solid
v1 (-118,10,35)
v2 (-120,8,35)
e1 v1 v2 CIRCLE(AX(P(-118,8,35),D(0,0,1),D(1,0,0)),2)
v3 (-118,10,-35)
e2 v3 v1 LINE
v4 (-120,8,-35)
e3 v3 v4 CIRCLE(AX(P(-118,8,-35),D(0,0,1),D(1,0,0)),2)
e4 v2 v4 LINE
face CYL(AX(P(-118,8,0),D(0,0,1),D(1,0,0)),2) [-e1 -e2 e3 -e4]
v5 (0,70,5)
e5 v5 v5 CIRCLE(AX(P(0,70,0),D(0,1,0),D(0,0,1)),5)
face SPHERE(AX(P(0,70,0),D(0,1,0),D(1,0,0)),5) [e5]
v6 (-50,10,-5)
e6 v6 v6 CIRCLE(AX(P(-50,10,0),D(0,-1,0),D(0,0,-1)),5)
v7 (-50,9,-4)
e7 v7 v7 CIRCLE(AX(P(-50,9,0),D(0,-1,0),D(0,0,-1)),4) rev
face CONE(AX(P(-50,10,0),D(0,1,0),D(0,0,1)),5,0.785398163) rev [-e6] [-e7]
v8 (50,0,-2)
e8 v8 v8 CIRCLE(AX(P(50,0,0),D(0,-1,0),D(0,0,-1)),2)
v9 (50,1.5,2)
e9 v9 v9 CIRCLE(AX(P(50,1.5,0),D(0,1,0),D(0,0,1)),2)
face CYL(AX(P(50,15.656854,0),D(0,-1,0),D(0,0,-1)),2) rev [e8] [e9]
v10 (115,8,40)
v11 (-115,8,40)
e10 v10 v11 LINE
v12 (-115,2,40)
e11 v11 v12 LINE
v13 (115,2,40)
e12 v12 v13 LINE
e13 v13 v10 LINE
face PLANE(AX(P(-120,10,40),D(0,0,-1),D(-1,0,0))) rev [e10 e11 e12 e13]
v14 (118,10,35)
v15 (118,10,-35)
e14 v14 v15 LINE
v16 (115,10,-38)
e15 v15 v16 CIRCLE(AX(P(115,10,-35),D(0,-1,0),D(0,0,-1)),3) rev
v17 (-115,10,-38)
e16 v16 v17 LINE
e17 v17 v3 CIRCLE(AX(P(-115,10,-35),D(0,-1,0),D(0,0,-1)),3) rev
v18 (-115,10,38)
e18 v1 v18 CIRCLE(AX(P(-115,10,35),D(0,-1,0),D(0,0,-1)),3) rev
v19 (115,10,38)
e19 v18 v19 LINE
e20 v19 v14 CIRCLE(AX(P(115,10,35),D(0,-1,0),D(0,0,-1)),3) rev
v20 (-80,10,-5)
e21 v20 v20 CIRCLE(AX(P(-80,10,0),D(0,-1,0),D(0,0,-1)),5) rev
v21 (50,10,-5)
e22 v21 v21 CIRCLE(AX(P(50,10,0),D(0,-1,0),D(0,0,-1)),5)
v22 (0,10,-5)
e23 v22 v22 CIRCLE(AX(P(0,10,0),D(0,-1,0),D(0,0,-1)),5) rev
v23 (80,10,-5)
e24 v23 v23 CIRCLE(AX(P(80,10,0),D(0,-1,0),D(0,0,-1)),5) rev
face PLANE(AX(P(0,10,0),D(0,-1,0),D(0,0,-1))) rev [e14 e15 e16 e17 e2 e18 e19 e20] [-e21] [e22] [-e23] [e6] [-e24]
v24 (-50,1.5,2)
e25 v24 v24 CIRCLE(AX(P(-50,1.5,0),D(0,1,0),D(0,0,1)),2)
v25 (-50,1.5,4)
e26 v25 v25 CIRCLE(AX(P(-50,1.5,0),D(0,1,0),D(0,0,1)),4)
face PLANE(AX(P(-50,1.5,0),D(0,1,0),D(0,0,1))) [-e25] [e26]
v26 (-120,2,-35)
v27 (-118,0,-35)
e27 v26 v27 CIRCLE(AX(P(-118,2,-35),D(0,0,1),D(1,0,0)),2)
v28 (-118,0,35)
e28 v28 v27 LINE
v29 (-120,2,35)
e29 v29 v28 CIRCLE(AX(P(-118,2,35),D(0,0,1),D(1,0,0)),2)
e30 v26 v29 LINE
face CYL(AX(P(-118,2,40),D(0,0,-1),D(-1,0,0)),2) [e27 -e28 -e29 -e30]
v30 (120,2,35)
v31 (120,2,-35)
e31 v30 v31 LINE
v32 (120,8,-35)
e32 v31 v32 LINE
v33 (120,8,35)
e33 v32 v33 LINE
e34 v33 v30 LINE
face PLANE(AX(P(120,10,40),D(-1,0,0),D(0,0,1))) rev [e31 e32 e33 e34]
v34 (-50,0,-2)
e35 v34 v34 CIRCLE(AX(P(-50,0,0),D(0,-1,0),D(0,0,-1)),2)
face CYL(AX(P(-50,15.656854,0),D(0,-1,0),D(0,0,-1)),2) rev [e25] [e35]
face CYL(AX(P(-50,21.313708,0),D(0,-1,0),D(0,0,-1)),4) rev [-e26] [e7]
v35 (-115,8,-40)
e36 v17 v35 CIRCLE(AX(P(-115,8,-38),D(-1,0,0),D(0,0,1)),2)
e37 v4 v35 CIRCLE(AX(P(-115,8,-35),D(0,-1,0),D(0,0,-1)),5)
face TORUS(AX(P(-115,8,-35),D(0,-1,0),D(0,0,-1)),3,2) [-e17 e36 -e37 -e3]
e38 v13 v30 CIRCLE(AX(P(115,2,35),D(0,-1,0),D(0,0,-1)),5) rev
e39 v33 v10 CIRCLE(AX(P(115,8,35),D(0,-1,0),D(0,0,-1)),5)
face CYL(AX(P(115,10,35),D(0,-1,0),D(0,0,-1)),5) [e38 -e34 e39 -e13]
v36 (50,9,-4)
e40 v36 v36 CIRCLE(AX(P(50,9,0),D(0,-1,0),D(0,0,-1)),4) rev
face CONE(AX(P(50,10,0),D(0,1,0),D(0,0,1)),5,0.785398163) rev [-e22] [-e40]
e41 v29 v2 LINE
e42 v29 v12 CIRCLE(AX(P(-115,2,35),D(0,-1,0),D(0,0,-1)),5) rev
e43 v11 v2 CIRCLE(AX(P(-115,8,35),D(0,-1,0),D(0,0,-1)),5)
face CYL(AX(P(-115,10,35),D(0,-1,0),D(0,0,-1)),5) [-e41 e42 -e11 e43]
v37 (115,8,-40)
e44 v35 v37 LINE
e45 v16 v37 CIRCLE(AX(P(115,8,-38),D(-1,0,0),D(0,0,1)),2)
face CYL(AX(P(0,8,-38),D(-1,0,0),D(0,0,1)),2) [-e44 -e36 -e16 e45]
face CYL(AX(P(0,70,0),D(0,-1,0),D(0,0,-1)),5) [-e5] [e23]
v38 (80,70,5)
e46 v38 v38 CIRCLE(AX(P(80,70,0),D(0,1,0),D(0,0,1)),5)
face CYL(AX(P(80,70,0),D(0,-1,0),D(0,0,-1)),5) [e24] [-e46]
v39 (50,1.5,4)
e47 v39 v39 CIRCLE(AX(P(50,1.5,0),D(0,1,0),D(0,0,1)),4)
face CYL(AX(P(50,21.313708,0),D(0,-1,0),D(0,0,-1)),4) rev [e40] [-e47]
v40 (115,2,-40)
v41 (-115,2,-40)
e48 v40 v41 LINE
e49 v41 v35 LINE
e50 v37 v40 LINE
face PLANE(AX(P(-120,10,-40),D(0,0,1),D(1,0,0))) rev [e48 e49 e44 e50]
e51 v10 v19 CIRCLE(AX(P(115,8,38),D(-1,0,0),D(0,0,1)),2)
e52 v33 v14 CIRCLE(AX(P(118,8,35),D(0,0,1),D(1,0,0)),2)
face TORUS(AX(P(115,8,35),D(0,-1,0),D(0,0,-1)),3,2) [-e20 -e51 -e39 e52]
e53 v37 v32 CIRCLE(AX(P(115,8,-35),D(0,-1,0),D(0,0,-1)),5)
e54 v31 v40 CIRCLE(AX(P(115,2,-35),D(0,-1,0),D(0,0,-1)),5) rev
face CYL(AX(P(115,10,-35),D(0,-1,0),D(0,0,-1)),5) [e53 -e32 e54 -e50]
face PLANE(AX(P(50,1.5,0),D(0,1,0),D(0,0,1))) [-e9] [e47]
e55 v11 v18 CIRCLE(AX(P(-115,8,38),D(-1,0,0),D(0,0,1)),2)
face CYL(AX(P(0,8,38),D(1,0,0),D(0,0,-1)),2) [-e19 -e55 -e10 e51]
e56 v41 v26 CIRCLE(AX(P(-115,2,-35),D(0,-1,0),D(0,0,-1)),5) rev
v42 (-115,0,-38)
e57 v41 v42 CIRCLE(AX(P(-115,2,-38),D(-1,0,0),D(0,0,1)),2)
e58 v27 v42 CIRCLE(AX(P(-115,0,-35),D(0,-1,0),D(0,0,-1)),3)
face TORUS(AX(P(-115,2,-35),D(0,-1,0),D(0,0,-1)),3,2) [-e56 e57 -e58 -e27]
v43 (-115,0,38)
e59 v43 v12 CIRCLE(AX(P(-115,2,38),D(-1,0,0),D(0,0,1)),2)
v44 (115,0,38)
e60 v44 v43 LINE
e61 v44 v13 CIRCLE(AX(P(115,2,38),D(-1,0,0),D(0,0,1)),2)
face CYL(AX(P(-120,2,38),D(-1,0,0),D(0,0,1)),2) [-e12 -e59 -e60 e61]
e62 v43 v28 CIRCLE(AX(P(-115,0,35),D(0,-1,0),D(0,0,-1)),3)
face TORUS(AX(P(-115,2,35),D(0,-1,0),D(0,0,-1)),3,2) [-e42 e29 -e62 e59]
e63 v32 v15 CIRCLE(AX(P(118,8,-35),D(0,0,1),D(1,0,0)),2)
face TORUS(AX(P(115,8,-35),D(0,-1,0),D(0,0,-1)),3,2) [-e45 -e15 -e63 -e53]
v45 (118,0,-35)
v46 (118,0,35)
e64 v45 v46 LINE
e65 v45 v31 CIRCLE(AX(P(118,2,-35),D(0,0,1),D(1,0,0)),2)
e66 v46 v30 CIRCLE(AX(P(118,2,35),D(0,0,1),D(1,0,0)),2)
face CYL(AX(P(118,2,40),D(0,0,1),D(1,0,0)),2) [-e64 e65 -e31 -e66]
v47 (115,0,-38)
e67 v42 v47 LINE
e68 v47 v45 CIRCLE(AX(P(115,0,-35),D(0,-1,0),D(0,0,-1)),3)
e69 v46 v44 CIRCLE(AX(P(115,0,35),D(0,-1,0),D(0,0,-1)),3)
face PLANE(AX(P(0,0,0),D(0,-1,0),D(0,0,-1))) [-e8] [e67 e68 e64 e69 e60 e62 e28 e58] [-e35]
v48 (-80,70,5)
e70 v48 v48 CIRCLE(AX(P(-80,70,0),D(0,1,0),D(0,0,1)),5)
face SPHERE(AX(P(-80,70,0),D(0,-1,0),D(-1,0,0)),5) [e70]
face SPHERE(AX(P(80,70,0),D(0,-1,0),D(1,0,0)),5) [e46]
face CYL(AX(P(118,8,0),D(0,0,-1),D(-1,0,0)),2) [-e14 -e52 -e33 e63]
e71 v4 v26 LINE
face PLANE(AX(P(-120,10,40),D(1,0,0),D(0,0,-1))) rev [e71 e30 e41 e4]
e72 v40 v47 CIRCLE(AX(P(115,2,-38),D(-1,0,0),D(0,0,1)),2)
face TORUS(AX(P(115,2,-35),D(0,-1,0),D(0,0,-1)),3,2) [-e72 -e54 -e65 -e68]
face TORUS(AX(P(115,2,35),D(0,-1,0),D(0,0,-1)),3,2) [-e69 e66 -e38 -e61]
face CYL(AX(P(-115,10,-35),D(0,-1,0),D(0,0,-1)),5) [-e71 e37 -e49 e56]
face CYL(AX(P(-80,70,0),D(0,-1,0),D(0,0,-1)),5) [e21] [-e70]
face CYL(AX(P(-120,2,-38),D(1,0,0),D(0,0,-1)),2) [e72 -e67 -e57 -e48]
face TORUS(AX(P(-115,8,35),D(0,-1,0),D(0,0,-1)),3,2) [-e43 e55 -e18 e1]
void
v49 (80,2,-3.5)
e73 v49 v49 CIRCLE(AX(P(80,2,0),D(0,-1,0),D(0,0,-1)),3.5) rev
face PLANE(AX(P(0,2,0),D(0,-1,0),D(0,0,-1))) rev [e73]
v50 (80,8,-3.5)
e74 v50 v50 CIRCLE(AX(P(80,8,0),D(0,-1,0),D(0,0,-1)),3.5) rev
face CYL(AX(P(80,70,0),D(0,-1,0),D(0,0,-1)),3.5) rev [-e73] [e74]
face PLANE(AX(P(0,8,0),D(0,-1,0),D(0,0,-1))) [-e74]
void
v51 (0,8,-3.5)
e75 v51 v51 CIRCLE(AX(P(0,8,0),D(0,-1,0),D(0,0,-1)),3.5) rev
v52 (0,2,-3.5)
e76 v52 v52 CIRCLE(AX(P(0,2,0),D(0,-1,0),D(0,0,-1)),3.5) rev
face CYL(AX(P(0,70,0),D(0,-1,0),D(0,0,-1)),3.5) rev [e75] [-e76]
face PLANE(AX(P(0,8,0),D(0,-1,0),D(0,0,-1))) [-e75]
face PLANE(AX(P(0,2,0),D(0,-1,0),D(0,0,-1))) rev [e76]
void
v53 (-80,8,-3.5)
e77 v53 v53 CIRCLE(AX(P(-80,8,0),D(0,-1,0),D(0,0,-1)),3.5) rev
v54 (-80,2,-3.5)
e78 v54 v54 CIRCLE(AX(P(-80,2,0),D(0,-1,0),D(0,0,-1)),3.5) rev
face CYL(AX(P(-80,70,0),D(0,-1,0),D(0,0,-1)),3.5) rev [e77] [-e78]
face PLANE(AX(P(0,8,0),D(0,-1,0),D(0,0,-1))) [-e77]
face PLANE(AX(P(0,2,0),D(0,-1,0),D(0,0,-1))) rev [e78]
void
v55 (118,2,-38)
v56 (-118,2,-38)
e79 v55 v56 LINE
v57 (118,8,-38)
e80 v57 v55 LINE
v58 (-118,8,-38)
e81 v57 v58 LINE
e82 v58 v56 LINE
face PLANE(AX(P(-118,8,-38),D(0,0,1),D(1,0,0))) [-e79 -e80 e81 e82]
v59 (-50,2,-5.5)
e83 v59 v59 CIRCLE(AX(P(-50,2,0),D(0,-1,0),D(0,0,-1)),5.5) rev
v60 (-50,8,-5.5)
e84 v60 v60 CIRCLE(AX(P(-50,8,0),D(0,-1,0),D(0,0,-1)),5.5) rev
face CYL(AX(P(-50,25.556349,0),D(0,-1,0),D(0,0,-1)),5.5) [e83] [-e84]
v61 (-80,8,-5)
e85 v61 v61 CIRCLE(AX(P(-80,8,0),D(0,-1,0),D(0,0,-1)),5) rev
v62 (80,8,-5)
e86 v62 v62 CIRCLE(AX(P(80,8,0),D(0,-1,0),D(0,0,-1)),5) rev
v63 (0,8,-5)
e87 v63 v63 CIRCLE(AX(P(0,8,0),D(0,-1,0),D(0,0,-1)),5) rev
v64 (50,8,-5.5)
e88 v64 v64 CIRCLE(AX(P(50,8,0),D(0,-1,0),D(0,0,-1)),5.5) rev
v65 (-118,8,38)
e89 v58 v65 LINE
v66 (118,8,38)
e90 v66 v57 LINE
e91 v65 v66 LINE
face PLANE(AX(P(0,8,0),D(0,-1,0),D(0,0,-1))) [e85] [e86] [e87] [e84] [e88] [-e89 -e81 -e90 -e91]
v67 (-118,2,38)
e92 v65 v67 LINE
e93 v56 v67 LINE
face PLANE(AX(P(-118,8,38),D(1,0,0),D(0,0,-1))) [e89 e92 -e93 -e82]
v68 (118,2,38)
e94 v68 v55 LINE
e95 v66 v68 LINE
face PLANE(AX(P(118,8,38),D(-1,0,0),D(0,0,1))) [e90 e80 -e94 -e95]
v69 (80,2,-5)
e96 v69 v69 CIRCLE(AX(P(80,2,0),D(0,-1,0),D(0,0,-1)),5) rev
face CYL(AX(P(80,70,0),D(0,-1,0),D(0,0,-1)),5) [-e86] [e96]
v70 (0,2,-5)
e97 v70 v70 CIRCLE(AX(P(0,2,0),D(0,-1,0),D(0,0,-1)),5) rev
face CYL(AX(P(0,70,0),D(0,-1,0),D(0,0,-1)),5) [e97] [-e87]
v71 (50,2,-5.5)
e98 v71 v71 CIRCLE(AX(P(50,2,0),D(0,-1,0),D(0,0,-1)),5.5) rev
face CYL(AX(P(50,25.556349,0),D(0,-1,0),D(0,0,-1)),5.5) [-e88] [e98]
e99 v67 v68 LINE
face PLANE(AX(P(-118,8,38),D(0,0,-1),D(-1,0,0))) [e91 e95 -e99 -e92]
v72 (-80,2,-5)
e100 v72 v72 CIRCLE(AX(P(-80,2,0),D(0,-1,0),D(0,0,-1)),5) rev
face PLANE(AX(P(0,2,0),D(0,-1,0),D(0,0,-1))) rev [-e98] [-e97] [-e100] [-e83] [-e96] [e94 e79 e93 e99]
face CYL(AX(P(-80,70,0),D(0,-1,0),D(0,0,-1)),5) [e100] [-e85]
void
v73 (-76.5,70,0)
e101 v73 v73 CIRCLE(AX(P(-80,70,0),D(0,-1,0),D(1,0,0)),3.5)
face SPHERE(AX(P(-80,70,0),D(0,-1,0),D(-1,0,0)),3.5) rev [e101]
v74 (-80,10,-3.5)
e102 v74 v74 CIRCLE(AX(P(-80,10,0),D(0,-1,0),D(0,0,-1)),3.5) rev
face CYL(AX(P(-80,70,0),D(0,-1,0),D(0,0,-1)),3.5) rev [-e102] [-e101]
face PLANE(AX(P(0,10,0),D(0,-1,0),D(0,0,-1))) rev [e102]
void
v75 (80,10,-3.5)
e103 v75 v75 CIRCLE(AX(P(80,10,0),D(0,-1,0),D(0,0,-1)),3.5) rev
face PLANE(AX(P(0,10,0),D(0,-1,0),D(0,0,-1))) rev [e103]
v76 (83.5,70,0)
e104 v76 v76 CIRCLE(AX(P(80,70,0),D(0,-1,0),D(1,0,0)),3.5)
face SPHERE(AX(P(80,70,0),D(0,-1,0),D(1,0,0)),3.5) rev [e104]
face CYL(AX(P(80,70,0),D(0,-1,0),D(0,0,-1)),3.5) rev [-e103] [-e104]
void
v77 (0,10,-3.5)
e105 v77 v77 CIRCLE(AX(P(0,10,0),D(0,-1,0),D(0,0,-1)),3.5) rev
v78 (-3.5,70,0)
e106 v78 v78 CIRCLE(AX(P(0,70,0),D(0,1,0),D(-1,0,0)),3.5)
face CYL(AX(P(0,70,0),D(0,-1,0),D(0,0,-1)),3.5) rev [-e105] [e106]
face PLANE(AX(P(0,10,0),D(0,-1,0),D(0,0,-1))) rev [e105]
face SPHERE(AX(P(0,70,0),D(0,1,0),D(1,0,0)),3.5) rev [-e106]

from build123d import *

# Parameters (mm, degrees)
SKETCH_4_W          = 240
SKETCH_4_H          = 80
EXTRUDE_2_DEPTH     = 10
CUT_EXTRUDE_START   = 2
SKETCH_5_W          = 236
SKETCH_5_H          = 76
CUT_EXTRUDE_1_DEPTH = 6
FILLET_2_R          = 5
FILLET_1_R          = 2
SKETCH_6_R          = 5
SKETCH_6_R_2        = 3.5
EXTRUDE_3_DEPTH     = 70
CUT_EXTRUDE_2_REACH = 148.068
CUT_EXTRUDE_START_2 = 1.5
SKETCH_7_R          = 4
SKETCH_8_R          = 5.5
SKETCH_8_R_2        = 4
EXTRUDE_4_DEPTH     = 10
SKETCH_9_R          = 2
CUT_EXTRUDE_3_DEPTH = 10
CHAMFER_1_SIZE      = 1


# Read off the part's stored shape, not the designer's step: 旋转2
with BuildPart() as part:
    # 草图4 → 凸台-拉伸2 (new body)
    with BuildSketch(Plane(origin=(0, 0, 0), x_dir=(1, 0, 0), z_dir=(0, 1, 0))):
        Rectangle(SKETCH_4_W, SKETCH_4_H)
    extrude(amount=EXTRUDE_2_DEPTH)

    # 草图5 → 切除-拉伸1 (cut)
    with BuildSketch(Plane(origin=(0, 0, 0), x_dir=(1, 0, 0), z_dir=(0, 1, 0)).offset(CUT_EXTRUDE_START)):
        Rectangle(SKETCH_5_W, SKETCH_5_H)
    extrude(amount=CUT_EXTRUDE_1_DEPTH, mode=Mode.SUBTRACT)

    # 圆角2
    fillet_2_edges = [part.edges().sort_by_distance(p)[0] for p in [
        (120, 5, 40),
        (-120, 5, 40),
        (-120, 5, -40),
        (120, 5, -40),
    ]]
    fillet(fillet_2_edges, radius=FILLET_2_R)

    # 圆角1
    fillet_1_edges = [part.edges().sort_by_distance(p)[0] for p in [
        (120, 0, 0),
        (120, 10, 0),
        (0, 0, 40),
        (-120, 0, 0),
        (0, 0, -40),
        (118.535533906, 0, -38.535533906),
        (-118.535533906, 0, -38.535533906),
        (-118.535533906, 0, 38.535533906),
        (118.535533906, 0, 38.535533906),
        (0, 10, 40),
        (0, 10, -40),
        (-120, 10, 0),
        (118.535533906, 10, -38.535533906),
        (-118.535533906, 10, -38.535533906),
        (-118.535533906, 10, 38.535533906),
        (118.535533906, 10, 38.535533906),
    ]]
    fillet(fillet_1_edges, radius=FILLET_1_R)

    # 草图6 → 凸台-拉伸3 (add)
    # profile 1 of 3: a face of its own
    with BuildSketch(Plane(origin=(0, 0, 0), x_dir=(1, 0, 0), z_dir=(0, 1, 0))):
        with Locations(Location((-80, 0, 0), (0, 0, 90))):
            Circle(SKETCH_6_R)
        with Locations(Location((-80, 0, 0), (0, 0, 90))):
            Circle(SKETCH_6_R_2, mode=Mode.SUBTRACT)
    # profile 2 of 3: a face of its own
    with BuildSketch(Plane(origin=(0, 0, 0), x_dir=(1, 0, 0), z_dir=(0, 1, 0))):
        with Locations(Location((0, 0, 0), (0, 0, 90))):
            Circle(SKETCH_6_R)
        with Locations(Location((0, 0, 0), (0, 0, 90))):
            Circle(SKETCH_6_R_2, mode=Mode.SUBTRACT)
    # profile 3 of 3: a face of its own
    with BuildSketch(Plane(origin=(0, 0, 0), x_dir=(1, 0, 0), z_dir=(0, 1, 0))):
        with Locations(Location((80, 0, 0), (0, 0, 90))):
            Circle(SKETCH_6_R)
        with Locations(Location((80, 0, 0), (0, 0, 90))):
            Circle(SKETCH_6_R_2, mode=Mode.SUBTRACT)
    extrude(amount=EXTRUDE_3_DEPTH)

    # 切除-拉伸2: up to this face of the body (flat: up to its plane)
    cut_extrude_2_end = Plane(part.part.faces().sort_by_distance((115.520645245, 10, 0))[0])
    # 草图7 → 切除-拉伸2 (cut, up to the picked face)
    with BuildSketch(Plane(origin=(0, 0, 0), x_dir=(1, 0, 0), z_dir=(0, 1, 0)).offset(CUT_EXTRUDE_START_2), mode=Mode.PRIVATE) as cut_extrude_2_sk1:
        with Locations(Location((-50, 0, 0), (0, 0, 90))):
            Circle(SKETCH_7_R)
    cut_extrude_2_tool1 = split(extrude(cut_extrude_2_sk1.sketch, amount=CUT_EXTRUDE_2_REACH, mode=Mode.PRIVATE), bisect_by=cut_extrude_2_end, keep=Keep.BOTH, mode=Mode.PRIVATE)
    # 草图7 → 切除-拉伸2 (cut, up to the picked face)
    with BuildSketch(Plane(origin=(0, 0, 0), x_dir=(1, 0, 0), z_dir=(0, 1, 0)).offset(CUT_EXTRUDE_START_2), mode=Mode.PRIVATE) as cut_extrude_2_sk2:
        with Locations(Location((50, 0, 0), (0, 0, 90))):
            Circle(SKETCH_7_R)
    cut_extrude_2_tool2 = split(extrude(cut_extrude_2_sk2.sketch, amount=CUT_EXTRUDE_2_REACH, mode=Mode.PRIVATE), bisect_by=cut_extrude_2_end, keep=Keep.BOTH, mode=Mode.PRIVATE)
    add(cut_extrude_2_tool1.solids().sort_by(Axis((-50, 1.5, 0), (0, 1, 0)))[0], mode=Mode.SUBTRACT)
    add(cut_extrude_2_tool2.solids().sort_by(Axis((50, 1.5, 0), (0, 1, 0)))[0], mode=Mode.SUBTRACT)

    # 草图8 → 凸台-拉伸4 (add)
    # profile 1 of 2: a face of its own
    with BuildSketch(Plane(origin=(0, 0, 0), x_dir=(1, 0, 0), z_dir=(0, 1, 0))):
        with Locations(Location((-50, 0, 0), (0, 0, 90))):
            Circle(SKETCH_8_R)
        with Locations(Location((-50, 0, 0), (0, 0, 90))):
            Circle(SKETCH_8_R_2, mode=Mode.SUBTRACT)
    # profile 2 of 2: a face of its own
    with BuildSketch(Plane(origin=(0, 0, 0), x_dir=(1, 0, 0), z_dir=(0, 1, 0))):
        with Locations(Location((50, 0, 0), (0, 0, 90))):
            Circle(SKETCH_8_R)
        with Locations(Location((50, 0, 0), (0, 0, 90))):
            Circle(SKETCH_8_R_2, mode=Mode.SUBTRACT)
    extrude(amount=EXTRUDE_4_DEPTH)

    # 草图9 → 切除-拉伸3 (cut)
    with BuildSketch(Plane(origin=(0, 0, 0), x_dir=(1, 0, 0), z_dir=(0, 1, 0))):
        with Locations(Location((-50, 0, 0), (0, 0, 90))):
            Circle(SKETCH_9_R)
        with Locations(Location((50, 0, 0), (0, 0, 90))):
            Circle(SKETCH_9_R)
    extrude(amount=CUT_EXTRUDE_3_DEPTH, mode=Mode.SUBTRACT)

    # 倒角1
    chamfer_1_edges = [part.edges().sort_by_distance(p)[0] for p in [
        (-50, 10, 4),
        (50, 10, 4),
    ]]
    chamfer(chamfer_1_edges, length=CHAMFER_1_SIZE)

    # 旋转2 outline → 旋转2 (revolve)
    with BuildSketch(Plane(origin=(-80, 0, 0), x_dir=(1, 0, 0), z_dir=(0, 0, 1))):
        with BuildLine():
            Line((3.5, 69.999999996), (5, 69.999999996))
            ThreePointArc((5, 69.999999996), (3.535533907, 73.535533905), (0, 75))
            Line((0, 75), (0, 73.5))
            ThreePointArc((0, 73.5), (2.474873735, 72.474873733), (3.5, 69.999999996))
        make_face()
    revolve(axis=Axis((-80, 0, 0), (0, 1, 0)))

    # 草图13 → 旋转3 (revolve)
    with BuildSketch(Plane.XY):
        with BuildLine():
            Line((83.5, 70), (85, 70))
            ThreePointArc((85, 70), (83.535533906, 73.535533906), (80, 75))
            Line((80, 75), (80, 73.5))
            ThreePointArc((80, 73.5), (82.474873734, 72.474873734), (83.5, 70))
        make_face()
    revolve(axis=Axis((80, -930, 0), (0, 1, 0)))

    # 草图14 → 旋转5 (revolve)
    with BuildSketch(Plane.XY):
        with BuildLine():
            Line((0, 75), (0, 73.5))
            ThreePointArc((0, 73.5), (2.474873734, 72.474873734), (3.5, 70))
            Line((3.5, 70), (5, 70))
            ThreePointArc((5, 70), (3.535533906, 73.535533906), (0, 75))
        make_face()
    revolve(axis=Axis((0, -1000, 0), (0, 1, 0)))


solid = part.part
